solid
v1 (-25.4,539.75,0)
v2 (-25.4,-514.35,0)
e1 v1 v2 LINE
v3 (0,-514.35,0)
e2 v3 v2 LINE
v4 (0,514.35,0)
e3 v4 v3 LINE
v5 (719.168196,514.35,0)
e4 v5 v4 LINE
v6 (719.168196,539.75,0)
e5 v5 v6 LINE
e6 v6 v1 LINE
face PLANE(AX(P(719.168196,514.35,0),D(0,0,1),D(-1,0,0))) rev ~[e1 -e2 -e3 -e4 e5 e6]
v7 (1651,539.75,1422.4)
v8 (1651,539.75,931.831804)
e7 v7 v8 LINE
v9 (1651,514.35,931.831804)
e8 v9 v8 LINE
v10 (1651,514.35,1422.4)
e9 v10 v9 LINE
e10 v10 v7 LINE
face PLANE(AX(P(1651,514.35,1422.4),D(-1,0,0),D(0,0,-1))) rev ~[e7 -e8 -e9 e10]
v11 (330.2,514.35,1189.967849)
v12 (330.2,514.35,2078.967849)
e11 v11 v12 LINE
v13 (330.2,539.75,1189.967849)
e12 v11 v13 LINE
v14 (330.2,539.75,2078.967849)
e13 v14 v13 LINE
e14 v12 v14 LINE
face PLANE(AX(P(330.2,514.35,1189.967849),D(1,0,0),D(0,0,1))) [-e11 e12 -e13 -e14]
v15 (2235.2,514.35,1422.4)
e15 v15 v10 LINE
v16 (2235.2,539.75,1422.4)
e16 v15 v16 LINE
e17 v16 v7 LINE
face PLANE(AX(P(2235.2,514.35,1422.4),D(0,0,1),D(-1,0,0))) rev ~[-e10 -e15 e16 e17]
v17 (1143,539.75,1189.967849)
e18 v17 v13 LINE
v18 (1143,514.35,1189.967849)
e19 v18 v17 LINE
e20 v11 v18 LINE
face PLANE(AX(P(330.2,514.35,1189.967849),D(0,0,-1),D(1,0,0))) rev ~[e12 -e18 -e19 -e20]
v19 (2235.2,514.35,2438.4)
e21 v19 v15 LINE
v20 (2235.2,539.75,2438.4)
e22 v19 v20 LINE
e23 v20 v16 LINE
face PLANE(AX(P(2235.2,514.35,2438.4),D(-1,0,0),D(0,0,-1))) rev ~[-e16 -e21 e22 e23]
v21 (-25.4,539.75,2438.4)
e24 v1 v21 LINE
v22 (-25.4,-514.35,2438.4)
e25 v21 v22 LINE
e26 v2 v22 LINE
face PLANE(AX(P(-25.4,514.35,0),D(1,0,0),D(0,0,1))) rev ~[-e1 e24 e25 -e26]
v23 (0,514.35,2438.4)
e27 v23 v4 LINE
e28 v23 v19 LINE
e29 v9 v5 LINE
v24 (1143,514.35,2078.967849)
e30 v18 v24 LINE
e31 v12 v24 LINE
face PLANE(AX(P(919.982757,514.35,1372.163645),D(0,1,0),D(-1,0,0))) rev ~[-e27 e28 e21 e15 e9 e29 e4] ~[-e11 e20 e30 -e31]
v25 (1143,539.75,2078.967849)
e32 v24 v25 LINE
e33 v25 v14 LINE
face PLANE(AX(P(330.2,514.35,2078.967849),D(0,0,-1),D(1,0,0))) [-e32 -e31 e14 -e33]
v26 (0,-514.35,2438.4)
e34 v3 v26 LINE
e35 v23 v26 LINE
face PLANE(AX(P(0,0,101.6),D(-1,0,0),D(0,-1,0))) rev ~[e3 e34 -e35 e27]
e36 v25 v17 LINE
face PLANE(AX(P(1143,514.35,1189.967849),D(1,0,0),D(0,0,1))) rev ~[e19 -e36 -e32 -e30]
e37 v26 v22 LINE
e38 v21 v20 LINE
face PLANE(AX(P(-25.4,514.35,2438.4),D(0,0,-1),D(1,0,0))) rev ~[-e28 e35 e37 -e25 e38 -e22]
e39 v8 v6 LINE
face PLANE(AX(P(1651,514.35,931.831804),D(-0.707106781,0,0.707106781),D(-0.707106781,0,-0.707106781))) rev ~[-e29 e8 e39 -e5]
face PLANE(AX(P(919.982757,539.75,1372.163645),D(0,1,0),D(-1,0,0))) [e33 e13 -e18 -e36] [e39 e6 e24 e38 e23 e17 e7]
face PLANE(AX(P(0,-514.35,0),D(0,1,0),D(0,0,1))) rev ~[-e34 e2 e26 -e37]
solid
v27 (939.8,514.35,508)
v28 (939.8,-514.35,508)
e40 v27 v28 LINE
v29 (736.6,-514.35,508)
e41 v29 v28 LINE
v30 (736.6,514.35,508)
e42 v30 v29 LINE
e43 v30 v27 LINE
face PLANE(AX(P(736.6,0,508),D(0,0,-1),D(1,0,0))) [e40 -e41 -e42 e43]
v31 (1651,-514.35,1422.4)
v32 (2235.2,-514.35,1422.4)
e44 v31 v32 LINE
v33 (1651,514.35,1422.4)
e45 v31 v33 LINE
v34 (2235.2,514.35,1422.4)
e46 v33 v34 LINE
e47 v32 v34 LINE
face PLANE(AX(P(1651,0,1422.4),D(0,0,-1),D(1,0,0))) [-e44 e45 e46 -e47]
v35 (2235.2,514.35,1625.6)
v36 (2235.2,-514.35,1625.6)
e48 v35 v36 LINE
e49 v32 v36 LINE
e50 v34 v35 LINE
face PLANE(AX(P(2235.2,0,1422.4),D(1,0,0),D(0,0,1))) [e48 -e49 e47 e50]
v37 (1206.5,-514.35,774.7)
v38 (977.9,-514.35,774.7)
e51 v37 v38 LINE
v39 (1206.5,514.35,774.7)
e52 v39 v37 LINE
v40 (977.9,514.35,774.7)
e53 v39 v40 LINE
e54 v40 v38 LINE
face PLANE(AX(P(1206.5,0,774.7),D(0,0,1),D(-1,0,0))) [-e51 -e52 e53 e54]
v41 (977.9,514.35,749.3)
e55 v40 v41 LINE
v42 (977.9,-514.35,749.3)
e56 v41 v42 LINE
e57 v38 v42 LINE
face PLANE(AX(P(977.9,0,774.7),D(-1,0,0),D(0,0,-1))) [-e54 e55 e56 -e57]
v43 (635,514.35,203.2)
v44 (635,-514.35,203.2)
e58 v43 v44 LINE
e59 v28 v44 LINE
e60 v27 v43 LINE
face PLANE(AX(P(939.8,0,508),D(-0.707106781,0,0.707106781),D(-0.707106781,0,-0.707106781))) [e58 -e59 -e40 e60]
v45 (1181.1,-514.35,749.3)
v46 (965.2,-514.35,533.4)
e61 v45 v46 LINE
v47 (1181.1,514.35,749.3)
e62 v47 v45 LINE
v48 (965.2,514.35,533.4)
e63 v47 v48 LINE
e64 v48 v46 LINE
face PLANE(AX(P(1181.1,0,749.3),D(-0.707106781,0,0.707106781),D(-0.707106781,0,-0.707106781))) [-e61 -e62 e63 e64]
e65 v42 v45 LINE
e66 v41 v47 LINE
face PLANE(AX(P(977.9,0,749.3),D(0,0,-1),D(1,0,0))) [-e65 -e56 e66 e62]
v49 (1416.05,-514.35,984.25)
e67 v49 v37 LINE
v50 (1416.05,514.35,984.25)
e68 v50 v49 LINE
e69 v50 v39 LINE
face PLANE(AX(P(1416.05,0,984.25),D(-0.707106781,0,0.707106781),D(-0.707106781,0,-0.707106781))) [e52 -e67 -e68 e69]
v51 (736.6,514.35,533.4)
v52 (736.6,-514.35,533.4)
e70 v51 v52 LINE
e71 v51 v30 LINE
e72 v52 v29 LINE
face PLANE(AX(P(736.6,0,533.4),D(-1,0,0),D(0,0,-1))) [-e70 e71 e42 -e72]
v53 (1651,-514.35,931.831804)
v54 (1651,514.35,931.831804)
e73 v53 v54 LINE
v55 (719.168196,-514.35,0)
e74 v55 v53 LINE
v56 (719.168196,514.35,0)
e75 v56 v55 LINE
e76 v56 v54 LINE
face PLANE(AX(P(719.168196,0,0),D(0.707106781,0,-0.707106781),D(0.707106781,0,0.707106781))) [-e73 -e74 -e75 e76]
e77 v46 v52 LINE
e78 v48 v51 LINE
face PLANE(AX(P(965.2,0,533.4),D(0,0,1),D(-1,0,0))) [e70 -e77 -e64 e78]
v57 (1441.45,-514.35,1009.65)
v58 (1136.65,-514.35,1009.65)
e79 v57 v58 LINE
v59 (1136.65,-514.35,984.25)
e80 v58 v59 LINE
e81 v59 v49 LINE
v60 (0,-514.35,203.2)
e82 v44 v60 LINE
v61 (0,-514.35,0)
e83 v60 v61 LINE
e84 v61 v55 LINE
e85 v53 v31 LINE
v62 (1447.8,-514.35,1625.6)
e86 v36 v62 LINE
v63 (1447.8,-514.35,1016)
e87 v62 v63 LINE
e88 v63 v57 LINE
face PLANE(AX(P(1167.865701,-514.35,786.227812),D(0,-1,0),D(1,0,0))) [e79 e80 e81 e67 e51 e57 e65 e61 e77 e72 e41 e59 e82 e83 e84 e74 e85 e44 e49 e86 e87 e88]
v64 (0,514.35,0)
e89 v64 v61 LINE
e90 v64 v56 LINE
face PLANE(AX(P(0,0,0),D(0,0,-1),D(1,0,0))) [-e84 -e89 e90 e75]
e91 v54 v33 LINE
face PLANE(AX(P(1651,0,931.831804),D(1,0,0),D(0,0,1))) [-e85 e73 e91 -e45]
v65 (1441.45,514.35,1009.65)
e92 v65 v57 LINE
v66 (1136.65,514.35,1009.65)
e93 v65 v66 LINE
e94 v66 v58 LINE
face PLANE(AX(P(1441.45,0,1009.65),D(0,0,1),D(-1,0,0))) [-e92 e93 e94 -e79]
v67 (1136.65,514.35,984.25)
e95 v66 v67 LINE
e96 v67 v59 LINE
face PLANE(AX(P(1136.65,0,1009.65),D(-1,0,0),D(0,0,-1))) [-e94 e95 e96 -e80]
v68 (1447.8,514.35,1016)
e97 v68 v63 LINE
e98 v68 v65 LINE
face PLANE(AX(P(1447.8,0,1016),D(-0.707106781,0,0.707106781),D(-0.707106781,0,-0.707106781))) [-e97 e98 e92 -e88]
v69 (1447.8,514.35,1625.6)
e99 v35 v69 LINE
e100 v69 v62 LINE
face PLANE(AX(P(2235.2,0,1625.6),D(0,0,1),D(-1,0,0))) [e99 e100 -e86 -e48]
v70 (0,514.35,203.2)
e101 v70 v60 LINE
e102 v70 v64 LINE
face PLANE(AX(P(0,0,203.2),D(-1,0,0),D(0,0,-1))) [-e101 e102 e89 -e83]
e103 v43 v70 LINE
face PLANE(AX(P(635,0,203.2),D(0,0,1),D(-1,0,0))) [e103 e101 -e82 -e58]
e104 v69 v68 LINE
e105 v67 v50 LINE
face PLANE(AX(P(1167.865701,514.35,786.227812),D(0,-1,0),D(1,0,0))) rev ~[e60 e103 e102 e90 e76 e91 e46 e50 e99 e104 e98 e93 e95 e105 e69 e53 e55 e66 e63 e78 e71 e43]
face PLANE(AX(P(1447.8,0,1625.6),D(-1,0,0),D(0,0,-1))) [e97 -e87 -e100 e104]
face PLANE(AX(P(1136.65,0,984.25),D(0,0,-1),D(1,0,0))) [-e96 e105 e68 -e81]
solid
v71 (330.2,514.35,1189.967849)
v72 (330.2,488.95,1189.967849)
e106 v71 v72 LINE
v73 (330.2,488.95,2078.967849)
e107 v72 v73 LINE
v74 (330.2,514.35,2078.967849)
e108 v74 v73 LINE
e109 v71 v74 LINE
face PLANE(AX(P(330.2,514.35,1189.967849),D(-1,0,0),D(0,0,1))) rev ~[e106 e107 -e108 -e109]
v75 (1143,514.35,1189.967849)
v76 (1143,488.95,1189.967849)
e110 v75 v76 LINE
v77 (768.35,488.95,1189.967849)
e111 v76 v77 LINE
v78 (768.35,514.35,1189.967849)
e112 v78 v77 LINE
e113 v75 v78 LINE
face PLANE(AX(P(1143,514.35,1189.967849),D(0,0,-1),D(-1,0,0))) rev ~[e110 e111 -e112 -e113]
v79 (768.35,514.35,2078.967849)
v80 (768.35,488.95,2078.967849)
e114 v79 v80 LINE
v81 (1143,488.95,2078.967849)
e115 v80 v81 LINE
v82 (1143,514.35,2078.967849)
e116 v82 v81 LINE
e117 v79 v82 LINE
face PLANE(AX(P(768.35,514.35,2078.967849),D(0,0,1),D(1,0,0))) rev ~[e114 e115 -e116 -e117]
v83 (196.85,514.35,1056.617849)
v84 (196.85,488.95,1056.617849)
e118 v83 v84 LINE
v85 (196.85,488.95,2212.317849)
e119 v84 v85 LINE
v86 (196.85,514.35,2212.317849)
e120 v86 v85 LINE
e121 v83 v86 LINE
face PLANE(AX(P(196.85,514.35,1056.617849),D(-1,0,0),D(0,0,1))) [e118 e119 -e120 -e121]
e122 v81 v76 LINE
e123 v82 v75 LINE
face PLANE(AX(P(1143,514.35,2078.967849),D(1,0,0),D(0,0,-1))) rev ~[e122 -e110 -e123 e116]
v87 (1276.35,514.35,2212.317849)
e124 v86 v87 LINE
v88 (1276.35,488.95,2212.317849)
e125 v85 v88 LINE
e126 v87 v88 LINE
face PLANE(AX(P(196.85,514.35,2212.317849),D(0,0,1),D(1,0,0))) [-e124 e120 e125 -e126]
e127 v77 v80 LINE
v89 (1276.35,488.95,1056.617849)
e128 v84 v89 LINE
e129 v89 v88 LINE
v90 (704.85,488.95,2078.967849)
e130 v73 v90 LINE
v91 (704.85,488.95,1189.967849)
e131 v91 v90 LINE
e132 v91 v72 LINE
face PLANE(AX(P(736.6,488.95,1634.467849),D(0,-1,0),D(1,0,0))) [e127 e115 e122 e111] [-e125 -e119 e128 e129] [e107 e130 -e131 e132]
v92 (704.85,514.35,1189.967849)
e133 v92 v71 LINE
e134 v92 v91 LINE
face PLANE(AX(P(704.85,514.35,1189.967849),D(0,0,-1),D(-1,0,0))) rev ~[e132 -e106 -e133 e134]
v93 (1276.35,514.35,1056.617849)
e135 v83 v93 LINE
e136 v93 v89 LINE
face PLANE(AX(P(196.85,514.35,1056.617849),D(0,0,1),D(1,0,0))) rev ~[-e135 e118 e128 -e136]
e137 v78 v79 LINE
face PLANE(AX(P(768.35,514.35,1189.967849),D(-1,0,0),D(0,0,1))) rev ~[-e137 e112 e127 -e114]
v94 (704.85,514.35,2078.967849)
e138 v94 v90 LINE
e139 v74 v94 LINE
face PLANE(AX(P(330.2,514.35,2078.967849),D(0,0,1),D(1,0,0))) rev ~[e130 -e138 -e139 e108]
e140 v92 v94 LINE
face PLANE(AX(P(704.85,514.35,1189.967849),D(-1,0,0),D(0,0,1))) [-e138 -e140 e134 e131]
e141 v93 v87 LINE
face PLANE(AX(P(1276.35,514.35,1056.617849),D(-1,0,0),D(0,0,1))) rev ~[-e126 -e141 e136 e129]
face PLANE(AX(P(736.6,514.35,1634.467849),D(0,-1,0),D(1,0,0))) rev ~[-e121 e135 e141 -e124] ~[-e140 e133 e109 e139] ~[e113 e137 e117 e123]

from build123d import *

# Parameters (mm, degrees)
F1_DEPTH = 514.35
F2_W     = 1028.7
F2_H     = 203.2
F2_H_2   = 2235.2
F3_DEPTH = 25.4
F5_DEPTH = 25.4
F6_W     = 812.8
F6_H     = 889
F7_DEPTH = 25.401
F8_W     = 1079.5
F8_H     = 1155.7
F8_W_2   = 63.5
F8_H_2   = 889
F9_DEPTH = 25.4


with BuildPart() as f1:
    # F0 (on Front) → F1 (new body, symmetric)
    with BuildSketch(Plane.XZ):
        Polygon((2235.2, 1422.4), (2235.2, 1625.6), (1447.8, 1625.6), (1447.8, 1016), (1441.45, 1009.65), (1136.65, 1009.65), (1136.65, 984.25), (1416.05, 984.25), (1206.5, 774.7), (977.9, 774.7), (977.9, 749.3), (1181.1, 749.3), (965.2, 533.4), (736.6, 533.4), (736.6, 508), (939.8, 508), (635, 203.2), (0, 203.2), (0, 0), (719.1681958742, 0), (1651, 931.8318041258), (1651, 1422.4), align=None)
    extrude(amount=F1_DEPTH, both=True)


with BuildPart() as f3:
    # F2 (on face) → F3 (new body)
    with BuildSketch(Plane(origin=(0, 0, 0), x_dir=(0, -1, 0), z_dir=(-1, 0, 0))):
        with Locations((0, 101.6)):
            Rectangle(F2_W, F2_H)
        with Locations((0, 1320.8)):
            Rectangle(F2_W, F2_H_2)
    extrude(amount=F3_DEPTH)

    # F4 (on face) → F5 (join)
    with BuildSketch(Plane(origin=(0, 514.35, 0), x_dir=(-1, 0, 0), z_dir=(0, 1, 0))):
        Polygon((-2235.2, 2438.4), (-2235.2, 1625.6), (-1447.8, 1625.6), (-1447.8, 1016), (-1441.45, 1009.65), (-1136.65, 1009.65), (-1136.65, 984.25), (-1416.05, 984.25), (-1206.5, 774.7), (-977.9, 774.7), (-977.9, 749.3), (-1181.1, 749.3), (-965.2, 533.4), (-736.6, 533.4), (-736.6, 508), (-939.8, 508), (-635, 203.2), (0, 203.2), (0, 0), (25.4, 0), (25.4, 2438.4), align=None)
        Polygon((-2235.2, 1625.6), (-2235.2, 1422.4), (-1651, 1422.4), (-1651, 931.8318041258), (-719.1681958742, 0), (0, 0), (0, 203.2), (-635, 203.2), (-939.8, 508), (-736.6, 508), (-736.6, 533.4), (-965.2, 533.4), (-1181.1, 749.3), (-977.9, 749.3), (-977.9, 774.7), (-1206.5, 774.7), (-1416.05, 984.25), (-1136.65, 984.25), (-1136.65, 1009.65), (-1441.45, 1009.65), (-1447.8, 1016), (-1447.8, 1625.6), align=None)
    extrude(amount=F5_DEPTH)

    # F6 (on face) → F7 (cut, through all)
    with BuildSketch(Plane.XZ.offset(-514.35)):
        with Locations((736.6, 1634.46784906)):
            Rectangle(F6_W, F6_H)
    extrude(amount=-F7_DEPTH, mode=Mode.SUBTRACT)


with BuildPart() as f9:
    # F8 (on face) → F9 (new body)
    with BuildSketch(Plane.XZ.offset(-514.35)):
        with Locations((736.6, 1634.46784906)):
            Rectangle(F8_W, F8_H)
        Polygon((704.85, 1189.96784906), (330.2, 1189.96784906), (330.2, 2078.96784906), (704.85, 2078.96784906), (768.35, 2078.96784906), (1143, 2078.96784906), (1143, 1189.96784906), (768.35, 1189.96784906), align=None, mode=Mode.SUBTRACT)
        with Locations((736.6, 1634.46784906)):
            Rectangle(F8_W_2, F8_H_2)
    extrude(amount=F9_DEPTH)


solid = Compound([f1.part, f3.part, f9.part])
